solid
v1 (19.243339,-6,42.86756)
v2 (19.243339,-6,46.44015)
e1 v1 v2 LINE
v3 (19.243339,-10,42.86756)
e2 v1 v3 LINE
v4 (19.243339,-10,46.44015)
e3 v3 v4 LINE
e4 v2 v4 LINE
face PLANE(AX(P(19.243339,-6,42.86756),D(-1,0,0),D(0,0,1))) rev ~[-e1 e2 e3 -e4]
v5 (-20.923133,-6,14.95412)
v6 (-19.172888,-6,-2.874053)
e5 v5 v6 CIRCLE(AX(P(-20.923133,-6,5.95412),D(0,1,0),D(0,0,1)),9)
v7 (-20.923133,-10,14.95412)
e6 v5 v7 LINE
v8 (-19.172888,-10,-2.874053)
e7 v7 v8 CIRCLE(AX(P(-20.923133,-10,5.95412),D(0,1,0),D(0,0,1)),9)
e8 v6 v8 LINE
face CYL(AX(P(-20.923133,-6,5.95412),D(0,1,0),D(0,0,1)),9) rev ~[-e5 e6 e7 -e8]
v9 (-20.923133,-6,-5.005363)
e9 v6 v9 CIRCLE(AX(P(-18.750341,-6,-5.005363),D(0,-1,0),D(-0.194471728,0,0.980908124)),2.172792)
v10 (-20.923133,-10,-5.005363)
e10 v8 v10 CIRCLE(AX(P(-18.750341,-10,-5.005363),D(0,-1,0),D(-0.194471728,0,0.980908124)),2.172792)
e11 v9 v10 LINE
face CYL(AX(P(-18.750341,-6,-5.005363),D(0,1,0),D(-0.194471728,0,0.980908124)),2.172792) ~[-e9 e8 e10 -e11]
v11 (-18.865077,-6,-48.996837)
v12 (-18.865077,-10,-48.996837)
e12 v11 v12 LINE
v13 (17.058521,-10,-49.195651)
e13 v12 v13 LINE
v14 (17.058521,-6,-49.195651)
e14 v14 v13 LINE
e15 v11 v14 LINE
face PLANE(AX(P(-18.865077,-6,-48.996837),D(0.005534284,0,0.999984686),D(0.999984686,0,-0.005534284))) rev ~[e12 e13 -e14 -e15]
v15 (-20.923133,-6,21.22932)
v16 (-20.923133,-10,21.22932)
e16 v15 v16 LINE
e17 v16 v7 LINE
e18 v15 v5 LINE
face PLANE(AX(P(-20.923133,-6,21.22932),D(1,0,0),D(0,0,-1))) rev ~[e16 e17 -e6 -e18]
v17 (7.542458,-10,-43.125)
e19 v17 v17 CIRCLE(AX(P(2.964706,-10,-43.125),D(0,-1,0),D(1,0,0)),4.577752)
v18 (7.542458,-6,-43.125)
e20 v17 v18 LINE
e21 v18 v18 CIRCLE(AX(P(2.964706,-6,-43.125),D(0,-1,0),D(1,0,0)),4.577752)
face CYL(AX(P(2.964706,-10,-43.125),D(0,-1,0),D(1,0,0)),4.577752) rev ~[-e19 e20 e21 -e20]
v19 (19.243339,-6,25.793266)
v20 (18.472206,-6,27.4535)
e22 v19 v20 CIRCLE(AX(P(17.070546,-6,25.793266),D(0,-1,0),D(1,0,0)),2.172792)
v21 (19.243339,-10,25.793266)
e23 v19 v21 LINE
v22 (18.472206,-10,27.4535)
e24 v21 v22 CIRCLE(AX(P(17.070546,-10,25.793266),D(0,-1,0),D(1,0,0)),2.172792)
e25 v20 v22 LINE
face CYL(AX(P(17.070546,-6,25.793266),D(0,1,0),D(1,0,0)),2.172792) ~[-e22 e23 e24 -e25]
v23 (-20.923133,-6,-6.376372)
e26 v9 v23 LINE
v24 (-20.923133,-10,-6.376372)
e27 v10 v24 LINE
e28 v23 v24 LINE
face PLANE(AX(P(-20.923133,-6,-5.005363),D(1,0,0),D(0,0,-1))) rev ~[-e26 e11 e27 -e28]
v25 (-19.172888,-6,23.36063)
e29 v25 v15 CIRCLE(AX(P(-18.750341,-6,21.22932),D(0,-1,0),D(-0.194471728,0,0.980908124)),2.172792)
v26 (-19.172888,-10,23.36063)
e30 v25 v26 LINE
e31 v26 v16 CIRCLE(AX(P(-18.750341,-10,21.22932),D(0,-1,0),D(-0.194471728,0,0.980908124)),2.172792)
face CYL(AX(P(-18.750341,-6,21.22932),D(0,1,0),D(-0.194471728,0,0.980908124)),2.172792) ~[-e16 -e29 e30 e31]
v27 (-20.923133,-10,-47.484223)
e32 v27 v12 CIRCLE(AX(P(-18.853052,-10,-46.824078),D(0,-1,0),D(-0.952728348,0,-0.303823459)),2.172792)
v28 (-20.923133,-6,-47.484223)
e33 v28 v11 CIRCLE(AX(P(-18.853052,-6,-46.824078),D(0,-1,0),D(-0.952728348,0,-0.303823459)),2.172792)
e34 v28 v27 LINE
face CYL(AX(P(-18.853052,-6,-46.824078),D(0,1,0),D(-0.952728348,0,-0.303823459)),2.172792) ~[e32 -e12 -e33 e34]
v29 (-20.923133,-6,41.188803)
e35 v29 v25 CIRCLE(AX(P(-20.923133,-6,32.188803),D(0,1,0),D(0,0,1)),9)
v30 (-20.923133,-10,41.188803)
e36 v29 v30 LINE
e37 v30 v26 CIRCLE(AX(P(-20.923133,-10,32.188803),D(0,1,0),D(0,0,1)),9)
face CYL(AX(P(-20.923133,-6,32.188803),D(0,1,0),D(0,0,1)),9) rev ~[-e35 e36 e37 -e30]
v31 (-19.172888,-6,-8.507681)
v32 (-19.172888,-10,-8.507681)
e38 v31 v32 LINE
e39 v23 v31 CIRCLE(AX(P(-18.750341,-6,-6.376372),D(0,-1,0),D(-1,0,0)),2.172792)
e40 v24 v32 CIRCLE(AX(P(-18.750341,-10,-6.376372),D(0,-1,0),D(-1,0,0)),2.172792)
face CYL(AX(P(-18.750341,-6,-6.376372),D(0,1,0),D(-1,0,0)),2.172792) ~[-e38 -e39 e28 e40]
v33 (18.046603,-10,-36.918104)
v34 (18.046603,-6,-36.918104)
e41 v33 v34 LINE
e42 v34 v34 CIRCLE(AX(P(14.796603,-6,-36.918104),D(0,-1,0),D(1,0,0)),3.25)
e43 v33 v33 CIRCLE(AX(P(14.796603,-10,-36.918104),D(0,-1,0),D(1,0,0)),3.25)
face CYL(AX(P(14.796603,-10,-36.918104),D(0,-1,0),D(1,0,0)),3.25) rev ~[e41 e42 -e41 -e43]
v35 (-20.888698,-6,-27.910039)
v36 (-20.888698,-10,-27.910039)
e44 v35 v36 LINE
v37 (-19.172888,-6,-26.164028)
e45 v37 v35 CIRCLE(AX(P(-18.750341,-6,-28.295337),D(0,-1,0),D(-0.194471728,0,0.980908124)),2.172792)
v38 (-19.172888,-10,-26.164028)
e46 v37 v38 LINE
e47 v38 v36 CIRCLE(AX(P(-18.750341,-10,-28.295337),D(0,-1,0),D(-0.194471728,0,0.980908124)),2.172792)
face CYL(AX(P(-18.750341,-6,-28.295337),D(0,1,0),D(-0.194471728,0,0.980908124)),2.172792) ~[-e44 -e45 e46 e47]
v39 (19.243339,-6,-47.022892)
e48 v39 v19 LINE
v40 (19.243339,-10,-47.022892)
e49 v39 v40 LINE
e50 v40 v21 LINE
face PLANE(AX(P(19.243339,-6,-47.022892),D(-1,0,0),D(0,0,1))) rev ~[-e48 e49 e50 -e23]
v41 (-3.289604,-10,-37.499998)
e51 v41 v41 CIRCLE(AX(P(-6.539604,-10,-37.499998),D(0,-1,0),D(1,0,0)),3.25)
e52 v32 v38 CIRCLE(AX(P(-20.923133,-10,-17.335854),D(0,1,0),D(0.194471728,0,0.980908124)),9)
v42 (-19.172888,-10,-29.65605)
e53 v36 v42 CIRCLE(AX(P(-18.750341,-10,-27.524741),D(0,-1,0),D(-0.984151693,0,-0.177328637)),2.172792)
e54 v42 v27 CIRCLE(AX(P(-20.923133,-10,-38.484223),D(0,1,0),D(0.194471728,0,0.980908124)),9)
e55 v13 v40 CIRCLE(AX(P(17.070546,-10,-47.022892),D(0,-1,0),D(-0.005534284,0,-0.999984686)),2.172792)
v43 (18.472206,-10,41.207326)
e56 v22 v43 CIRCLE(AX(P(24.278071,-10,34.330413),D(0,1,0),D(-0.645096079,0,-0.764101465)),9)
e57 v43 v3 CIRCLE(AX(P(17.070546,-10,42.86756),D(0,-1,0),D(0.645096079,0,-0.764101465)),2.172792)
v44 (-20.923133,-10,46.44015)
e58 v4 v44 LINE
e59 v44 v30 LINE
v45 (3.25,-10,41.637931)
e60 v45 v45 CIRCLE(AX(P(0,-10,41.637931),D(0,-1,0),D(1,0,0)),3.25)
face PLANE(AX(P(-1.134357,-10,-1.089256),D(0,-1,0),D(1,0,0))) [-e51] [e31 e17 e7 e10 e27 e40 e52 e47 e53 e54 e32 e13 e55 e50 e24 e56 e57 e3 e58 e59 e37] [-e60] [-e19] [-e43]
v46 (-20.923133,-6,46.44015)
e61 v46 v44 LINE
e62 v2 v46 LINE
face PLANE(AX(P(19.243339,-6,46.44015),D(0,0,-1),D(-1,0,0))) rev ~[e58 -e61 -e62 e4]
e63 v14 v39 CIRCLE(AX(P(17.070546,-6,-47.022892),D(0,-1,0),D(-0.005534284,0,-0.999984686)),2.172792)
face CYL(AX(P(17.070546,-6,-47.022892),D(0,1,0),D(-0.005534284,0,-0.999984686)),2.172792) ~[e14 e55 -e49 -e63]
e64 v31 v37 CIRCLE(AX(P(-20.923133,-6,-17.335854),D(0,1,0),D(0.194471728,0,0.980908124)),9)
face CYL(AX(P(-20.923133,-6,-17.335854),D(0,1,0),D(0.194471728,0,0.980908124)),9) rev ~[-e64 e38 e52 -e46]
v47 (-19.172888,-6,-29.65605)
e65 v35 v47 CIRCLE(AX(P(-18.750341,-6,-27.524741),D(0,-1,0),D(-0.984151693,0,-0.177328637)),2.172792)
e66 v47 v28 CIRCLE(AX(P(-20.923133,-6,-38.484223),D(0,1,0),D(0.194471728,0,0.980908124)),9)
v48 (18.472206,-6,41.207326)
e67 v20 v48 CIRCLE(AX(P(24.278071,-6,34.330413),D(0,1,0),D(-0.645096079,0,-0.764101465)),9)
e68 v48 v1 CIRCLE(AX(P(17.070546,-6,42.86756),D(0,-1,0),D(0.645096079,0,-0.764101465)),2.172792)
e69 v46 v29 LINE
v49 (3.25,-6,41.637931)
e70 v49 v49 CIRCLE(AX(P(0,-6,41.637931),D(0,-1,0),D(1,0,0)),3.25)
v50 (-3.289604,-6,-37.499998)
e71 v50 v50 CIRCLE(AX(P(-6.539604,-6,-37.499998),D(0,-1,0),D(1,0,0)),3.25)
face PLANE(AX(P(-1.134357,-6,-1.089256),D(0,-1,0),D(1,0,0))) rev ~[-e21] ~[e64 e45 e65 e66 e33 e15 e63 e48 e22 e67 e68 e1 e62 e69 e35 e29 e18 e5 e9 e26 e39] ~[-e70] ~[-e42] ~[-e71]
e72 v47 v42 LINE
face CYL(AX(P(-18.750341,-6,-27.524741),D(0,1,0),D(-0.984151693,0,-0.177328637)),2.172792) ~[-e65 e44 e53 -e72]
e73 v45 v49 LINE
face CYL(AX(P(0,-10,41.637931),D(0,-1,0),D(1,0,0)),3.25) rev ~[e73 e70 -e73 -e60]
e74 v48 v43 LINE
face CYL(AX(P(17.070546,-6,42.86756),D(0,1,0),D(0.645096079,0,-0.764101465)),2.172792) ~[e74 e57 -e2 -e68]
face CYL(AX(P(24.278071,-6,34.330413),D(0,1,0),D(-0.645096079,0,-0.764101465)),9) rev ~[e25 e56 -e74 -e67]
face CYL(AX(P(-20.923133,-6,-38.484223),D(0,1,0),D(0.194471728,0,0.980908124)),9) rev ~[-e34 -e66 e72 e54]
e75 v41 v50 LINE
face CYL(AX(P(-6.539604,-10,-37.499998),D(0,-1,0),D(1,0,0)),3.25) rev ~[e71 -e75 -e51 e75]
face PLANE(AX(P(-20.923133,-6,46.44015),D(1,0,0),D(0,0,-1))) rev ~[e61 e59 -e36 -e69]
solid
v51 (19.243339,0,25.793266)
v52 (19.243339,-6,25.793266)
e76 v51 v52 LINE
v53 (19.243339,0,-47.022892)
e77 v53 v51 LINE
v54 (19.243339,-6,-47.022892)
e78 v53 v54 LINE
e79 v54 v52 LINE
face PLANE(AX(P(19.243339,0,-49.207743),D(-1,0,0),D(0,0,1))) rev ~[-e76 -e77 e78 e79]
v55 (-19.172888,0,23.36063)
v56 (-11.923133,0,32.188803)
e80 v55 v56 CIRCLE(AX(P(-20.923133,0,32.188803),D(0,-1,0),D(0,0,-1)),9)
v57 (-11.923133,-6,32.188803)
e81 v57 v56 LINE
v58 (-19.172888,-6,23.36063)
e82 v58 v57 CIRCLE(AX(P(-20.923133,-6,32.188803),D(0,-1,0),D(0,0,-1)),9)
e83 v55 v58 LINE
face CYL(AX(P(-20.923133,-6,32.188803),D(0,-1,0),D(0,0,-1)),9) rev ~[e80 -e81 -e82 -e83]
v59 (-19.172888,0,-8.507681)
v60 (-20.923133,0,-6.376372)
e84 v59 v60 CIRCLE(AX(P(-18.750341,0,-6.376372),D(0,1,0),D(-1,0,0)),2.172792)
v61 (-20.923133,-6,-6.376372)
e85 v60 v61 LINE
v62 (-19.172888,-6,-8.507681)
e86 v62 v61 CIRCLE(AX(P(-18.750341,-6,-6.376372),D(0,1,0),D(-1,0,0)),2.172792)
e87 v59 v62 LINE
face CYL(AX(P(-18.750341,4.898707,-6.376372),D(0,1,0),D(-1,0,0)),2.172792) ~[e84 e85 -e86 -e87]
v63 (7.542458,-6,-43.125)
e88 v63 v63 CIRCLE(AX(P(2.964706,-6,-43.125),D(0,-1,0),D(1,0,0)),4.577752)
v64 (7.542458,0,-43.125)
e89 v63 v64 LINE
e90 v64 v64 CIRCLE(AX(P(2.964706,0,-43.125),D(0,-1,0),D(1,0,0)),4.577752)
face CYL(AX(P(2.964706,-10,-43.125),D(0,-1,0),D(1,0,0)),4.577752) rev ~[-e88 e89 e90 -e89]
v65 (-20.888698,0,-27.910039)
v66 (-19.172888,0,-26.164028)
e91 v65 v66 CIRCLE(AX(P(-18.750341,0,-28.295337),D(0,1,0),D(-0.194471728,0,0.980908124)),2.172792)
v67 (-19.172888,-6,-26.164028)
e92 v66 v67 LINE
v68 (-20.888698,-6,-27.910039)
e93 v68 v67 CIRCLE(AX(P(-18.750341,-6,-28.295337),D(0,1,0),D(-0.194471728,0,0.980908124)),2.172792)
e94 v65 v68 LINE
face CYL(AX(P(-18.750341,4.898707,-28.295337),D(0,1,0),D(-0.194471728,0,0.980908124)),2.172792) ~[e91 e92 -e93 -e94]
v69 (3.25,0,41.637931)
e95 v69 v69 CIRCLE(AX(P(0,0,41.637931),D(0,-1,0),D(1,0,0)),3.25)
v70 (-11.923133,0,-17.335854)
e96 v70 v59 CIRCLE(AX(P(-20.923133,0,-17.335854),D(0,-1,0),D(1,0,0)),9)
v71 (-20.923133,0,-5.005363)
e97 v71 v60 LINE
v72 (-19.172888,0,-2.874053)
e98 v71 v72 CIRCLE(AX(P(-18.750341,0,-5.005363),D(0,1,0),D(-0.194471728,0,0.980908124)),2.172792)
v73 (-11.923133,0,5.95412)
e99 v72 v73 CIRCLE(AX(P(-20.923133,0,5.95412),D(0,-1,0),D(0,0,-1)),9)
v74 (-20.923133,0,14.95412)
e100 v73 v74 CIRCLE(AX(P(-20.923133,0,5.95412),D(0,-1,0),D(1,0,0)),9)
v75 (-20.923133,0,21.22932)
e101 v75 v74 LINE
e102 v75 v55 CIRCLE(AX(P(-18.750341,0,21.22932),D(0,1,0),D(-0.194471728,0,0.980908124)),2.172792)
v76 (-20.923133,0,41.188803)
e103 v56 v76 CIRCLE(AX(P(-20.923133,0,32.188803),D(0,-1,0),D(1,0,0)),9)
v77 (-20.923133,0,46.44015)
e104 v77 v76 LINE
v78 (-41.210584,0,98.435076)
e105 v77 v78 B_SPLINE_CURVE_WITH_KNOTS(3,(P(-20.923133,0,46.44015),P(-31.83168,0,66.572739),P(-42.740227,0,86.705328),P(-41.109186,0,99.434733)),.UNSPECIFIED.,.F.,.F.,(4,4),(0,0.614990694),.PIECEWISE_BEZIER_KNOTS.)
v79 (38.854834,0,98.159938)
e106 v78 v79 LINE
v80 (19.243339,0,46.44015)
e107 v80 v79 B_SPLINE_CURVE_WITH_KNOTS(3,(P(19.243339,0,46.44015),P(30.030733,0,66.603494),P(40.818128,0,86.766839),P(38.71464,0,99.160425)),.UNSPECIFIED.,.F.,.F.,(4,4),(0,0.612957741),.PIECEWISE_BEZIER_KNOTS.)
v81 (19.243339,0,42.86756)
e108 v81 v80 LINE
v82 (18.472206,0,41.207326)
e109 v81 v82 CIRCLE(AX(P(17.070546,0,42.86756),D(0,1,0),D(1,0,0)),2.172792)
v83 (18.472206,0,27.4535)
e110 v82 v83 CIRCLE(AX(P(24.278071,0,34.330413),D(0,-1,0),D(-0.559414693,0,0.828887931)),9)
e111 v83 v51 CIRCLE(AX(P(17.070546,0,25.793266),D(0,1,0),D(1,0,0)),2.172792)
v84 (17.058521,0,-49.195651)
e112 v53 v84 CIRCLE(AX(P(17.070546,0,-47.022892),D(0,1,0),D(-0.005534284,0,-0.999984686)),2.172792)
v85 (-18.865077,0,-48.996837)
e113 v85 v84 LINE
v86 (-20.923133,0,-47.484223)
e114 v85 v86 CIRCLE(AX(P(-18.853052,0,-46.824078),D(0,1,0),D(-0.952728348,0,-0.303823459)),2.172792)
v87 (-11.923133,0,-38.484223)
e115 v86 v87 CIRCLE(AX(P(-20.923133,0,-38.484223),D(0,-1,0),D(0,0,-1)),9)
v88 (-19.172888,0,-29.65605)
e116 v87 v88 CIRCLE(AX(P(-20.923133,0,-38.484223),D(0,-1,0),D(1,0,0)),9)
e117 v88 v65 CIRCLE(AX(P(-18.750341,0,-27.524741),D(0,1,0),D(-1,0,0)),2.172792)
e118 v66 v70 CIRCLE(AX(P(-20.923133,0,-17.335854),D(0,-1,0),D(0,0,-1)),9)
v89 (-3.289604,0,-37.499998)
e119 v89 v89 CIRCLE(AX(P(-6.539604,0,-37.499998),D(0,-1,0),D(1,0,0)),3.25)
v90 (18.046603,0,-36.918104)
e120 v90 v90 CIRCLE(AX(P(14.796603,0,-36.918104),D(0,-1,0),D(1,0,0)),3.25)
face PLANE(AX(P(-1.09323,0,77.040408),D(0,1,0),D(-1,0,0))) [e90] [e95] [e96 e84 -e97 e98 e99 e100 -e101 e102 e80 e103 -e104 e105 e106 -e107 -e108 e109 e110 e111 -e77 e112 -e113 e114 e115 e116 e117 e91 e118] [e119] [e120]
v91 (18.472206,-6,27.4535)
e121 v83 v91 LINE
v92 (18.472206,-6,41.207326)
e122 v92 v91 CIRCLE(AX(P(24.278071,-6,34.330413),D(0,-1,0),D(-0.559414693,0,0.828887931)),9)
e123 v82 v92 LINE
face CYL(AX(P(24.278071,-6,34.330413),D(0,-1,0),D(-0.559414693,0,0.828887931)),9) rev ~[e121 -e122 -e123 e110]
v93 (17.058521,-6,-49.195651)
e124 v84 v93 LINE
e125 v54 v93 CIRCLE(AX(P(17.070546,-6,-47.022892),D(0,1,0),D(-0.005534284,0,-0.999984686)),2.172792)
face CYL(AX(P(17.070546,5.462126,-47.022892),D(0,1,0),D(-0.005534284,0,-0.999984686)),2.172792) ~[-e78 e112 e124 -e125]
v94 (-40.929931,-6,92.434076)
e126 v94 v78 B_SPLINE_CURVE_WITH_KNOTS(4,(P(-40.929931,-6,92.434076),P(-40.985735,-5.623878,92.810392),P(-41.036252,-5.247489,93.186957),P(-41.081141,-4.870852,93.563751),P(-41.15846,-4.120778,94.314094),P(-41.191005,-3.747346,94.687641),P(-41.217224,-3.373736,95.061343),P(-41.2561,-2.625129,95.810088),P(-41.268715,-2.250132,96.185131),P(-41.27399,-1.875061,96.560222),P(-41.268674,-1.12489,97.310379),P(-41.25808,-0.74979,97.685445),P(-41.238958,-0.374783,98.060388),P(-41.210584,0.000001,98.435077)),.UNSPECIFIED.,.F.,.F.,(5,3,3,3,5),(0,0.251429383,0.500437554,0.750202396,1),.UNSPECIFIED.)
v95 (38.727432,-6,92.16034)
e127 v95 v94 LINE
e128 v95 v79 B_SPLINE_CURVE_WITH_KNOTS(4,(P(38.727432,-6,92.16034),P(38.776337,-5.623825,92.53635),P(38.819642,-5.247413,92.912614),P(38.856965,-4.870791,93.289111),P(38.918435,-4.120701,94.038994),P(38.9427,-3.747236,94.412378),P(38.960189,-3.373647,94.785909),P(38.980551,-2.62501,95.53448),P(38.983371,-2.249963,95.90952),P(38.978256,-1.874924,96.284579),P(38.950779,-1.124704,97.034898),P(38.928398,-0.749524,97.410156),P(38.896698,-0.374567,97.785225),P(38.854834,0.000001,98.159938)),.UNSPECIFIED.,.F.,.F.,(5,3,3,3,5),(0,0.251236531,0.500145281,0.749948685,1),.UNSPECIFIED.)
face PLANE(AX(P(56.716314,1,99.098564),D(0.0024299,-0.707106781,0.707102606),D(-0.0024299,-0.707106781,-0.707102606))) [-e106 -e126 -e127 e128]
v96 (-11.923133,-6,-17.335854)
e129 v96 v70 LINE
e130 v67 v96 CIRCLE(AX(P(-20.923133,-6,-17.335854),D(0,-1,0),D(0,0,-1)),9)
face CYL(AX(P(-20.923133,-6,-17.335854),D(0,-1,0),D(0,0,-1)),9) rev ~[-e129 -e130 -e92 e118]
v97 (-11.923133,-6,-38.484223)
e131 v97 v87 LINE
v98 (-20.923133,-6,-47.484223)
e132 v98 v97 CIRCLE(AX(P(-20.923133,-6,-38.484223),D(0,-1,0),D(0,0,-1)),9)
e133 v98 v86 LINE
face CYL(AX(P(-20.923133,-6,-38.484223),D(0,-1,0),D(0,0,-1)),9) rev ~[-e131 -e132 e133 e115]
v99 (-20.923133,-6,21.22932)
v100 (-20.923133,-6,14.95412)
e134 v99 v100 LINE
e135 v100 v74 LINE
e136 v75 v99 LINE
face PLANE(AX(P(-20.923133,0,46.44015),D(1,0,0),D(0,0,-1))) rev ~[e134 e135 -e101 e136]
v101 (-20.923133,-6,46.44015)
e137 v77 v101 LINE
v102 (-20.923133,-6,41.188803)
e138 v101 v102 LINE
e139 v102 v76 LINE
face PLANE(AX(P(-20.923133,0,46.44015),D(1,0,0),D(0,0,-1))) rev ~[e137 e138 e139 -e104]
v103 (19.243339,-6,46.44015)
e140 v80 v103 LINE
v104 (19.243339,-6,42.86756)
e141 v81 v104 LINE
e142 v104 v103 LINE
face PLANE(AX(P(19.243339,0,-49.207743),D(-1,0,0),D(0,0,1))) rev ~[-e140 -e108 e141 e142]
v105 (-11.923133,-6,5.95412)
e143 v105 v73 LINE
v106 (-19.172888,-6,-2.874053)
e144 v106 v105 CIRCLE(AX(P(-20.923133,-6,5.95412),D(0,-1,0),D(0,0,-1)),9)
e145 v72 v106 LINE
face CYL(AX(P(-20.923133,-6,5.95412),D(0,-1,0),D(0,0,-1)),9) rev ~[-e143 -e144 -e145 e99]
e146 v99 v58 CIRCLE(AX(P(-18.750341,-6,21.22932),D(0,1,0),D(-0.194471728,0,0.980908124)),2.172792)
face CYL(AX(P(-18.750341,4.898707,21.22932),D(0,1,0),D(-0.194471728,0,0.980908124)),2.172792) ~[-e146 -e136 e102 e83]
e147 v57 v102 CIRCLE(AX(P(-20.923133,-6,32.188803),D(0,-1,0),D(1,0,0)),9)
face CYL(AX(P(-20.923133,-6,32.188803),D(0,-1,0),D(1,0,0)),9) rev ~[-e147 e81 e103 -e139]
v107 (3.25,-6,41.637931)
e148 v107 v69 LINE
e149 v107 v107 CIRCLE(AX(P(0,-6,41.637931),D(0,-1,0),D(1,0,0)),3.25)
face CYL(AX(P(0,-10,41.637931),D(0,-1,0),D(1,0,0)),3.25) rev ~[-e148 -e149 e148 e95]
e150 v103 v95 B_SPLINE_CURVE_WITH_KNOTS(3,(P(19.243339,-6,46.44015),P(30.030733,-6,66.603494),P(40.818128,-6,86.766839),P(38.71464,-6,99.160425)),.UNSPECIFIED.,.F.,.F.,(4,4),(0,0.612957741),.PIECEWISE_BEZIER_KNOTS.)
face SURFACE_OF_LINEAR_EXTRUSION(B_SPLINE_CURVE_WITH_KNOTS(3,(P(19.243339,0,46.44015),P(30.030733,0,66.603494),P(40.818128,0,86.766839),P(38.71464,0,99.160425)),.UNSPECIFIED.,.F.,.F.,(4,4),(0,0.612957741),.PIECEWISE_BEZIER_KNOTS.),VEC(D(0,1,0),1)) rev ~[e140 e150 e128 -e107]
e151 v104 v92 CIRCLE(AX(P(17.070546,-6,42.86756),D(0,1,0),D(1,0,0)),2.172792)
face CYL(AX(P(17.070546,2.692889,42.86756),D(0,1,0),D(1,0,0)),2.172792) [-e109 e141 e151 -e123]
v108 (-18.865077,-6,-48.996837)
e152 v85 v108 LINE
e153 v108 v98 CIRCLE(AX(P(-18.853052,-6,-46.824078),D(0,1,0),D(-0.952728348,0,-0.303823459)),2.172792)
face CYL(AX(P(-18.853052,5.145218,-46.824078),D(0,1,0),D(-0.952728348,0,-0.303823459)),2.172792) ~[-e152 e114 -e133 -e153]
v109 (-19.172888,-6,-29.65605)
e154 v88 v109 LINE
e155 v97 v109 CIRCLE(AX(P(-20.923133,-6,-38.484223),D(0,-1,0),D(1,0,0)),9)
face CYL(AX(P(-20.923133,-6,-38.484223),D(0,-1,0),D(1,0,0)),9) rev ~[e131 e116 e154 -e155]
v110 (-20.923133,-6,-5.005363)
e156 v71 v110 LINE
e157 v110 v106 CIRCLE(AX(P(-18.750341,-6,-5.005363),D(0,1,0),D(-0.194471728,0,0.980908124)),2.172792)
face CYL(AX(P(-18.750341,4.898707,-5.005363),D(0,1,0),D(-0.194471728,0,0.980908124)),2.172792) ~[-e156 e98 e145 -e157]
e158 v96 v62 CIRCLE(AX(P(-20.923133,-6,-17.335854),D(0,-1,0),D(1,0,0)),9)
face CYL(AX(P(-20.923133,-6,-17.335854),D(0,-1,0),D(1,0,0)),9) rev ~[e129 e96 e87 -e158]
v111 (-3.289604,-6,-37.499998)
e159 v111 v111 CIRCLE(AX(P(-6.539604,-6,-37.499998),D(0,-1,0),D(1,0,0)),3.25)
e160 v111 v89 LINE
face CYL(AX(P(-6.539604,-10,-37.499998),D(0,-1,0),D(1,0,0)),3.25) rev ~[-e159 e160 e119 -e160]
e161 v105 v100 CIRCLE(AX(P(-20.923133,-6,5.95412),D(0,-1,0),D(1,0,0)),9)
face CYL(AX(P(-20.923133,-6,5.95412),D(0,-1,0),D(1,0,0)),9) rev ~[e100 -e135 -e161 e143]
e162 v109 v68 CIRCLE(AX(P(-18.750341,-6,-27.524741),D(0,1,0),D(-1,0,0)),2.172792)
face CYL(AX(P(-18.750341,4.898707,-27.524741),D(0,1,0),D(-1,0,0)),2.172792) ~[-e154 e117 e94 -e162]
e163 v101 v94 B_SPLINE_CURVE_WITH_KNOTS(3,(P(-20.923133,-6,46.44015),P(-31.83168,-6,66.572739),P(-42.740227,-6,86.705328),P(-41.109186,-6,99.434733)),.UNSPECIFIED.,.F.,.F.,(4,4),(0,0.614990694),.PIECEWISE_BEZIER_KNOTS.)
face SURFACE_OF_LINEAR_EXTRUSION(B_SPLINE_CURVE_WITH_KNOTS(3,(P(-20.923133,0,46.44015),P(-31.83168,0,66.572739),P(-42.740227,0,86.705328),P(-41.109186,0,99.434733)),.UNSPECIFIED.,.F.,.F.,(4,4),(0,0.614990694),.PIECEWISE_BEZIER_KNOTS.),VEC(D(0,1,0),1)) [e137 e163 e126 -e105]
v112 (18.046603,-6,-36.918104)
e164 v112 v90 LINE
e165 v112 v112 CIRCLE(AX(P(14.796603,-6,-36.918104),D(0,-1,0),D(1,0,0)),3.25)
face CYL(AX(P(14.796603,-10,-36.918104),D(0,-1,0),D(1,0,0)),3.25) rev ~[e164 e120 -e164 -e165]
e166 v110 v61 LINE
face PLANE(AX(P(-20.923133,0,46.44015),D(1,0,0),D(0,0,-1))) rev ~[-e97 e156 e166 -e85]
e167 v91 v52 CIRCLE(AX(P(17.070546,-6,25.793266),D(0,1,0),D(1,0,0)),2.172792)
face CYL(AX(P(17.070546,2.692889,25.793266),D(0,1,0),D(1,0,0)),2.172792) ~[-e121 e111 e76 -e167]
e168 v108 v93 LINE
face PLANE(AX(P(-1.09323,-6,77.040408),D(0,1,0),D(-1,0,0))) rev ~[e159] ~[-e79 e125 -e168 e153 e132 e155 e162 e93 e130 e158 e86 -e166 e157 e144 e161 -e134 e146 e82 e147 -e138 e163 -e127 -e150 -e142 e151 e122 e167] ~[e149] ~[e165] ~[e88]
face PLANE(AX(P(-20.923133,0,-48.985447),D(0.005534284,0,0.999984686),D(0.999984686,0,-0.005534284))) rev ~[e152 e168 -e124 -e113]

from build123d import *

# Parameters (mm, degrees)
F2_DEPTH    = 6
F3_T1_DEPTH = 115.827858657
F6_DEPTH    = 25
F7_T1_DEPTH = 15.7974131941
F7_T3_DEPTH = 16.290436999
F7_T5_DEPTH = 16.9242525679
F7_T7_DEPTH = 11.385777601
F9_DEPTH    = 4
F10_R       = 3.25
F10_R_2     = 4.5777520803
F11_DEPTH   = 25


# Not quite as in the source:
# - a fillet or chamfer that OpenCascade refuses, or shapes differently, is made with other operations: its cross-section is extruded or revolved along the edge and cut away or added


with BuildPart() as f2:
    # F1 (on face) → F2 (new body)
    with BuildSketch(Plane.XZ):
        with BuildLine():
            add(Edge.make_bspline(
                [(-20.9231331974, 46.4401495715), (-31.8316802492, 66.5727386597), (-42.740227301, 86.705327748), (-41.1091856658, 99.4347333908)],
                knots=[0, 0, 0, 0, 0.6149906941, 0.6149906941, 0.6149906941, 0.6149906941], degree=3))
            Line((-20.9231331974, 46.4401495715), (19.2433385447, 46.4401495715))
            add(Edge.make_bspline(
                [(19.2433385447, 46.4401495715), (30.0307332183, 66.6034940791), (40.8181278918, 86.7668385867), (38.7146398425, 99.160425365)],
                knots=[0, 0, 0, 0, 0.6129577408, 0.6129577408, 0.6129577408, 0.6129577408], degree=3))
            Line((38.7146398425, 99.160425365), (-41.1091856658, 99.4347333908))
        make_face()
        Polygon((19.2433385447, 46.4401495715), (-20.9231331974, 46.4401495715), (-20.9231331974, -48.9854468352), (19.2433385447, -49.2077428815), align=None)
    extrude(amount=F2_DEPTH)

    # F3: chamfer of 7 on 1 edges, made by hand

    # F3_s2 → F3_t1 (cut)
    with BuildSketch(Plane(origin=(56.3751046529, 0, -0.1937284209), x_dir=(0, 1, 0), z_dir=(-0.9999940956, 0, 0.0034363976))):
        Polygon((1, -99.2928787763), (-6, -92.2928787763), (-6, -99.2928787763), align=None)
    extrude(amount=F3_T1_DEPTH, mode=Mode.SUBTRACT)

    # F4 (on face) + F5 (on face) → F6 (cut)
    with BuildSketch(Plane.XZ.offset(6)):
        with BuildLine():
            ThreePointArc((-20.9231331974, 23.1888029575), (-14.5591721667, 25.8248419269), (-11.9231331974, 32.1888029575))
            ThreePointArc((-11.9231331974, 32.1888029575), (-14.5591721667, 38.5527639882), (-20.9231331974, 41.1888029575))
            Line((-20.9231331974, 41.1888029575), (-20.9231331974, 23.1888029575))
        make_face()
        with BuildLine():
            ThreePointArc((-11.9231331974, 5.9541198425), (-14.5591721667, 12.3180808732), (-20.9231331974, 14.9541198425))
            Line((-20.9231331974, 14.9541198425), (-20.9231331974, -3.0458801575))
            ThreePointArc((-20.9231331974, -3.0458801575), (-14.5591721667, -0.4098411882), (-11.9231331974, 5.9541198425))
        make_face()
        with BuildLine():
            ThreePointArc((-11.9231331974, -17.3358544707), (-14.5591721667, -10.9718934401), (-20.9231331974, -8.3358544707))
            Line((-20.9231331974, -8.3358544707), (-20.9231331974, -26.3358544707))
            ThreePointArc((-20.9231331974, -26.3358544707), (-14.5591721667, -23.6998155014), (-11.9231331974, -17.3358544707))
        make_face()
        with BuildLine():
            ThreePointArc((-11.9231331974, -38.484223187), (-14.5591721667, -32.1202621563), (-20.9231331974, -29.484223187))
            Line((-20.9231331974, -29.484223187), (-20.9231331974, -47.484223187))
            ThreePointArc((-20.9231331974, -47.484223187), (-14.5591721667, -44.8481842176), (-11.9231331974, -38.484223187))
        make_face()
    with BuildSketch(Plane.XZ.offset(6)):
        with BuildLine():
            Line((19.2433385447, 26.8704213686), (19.2433385447, 41.7904041223))
            ThreePointArc((19.2433385447, 41.7904041223), (15.2780707777, 34.3304127455), (19.2433385447, 26.8704213686))
        make_face()
    extrude(amount=-F6_DEPTH, mode=Mode.SUBTRACT)

    # F7: fillet of radius 2.1727922061 on 9 edges, made by hand

    # F7_s2 → F7_t1 (cut)
    with BuildSketch(Plane.XZ.offset(-4.898706597)):
        with BuildLine():
            ThreePointArc((-19.172887646, 23.3606298447), (-20.4294973343, 22.6082546705), (-20.9231331974, 21.2293203187))
            Line((-20.9231331974, 21.2293203187), (-20.9231331974, 23.1888029575))
            ThreePointArc((-20.9231331974, 23.1888029575), (-20.0438033433, 23.2318626871), (-19.172887646, 23.3606298447))
        make_face()
        with BuildLine():
            ThreePointArc((-19.172887646, -2.8740532703), (-20.4294973343, -3.6264284446), (-20.9231331974, -5.0053627963))
            Line((-20.9231331974, -5.0053627963), (-20.9231331974, -3.0458801575))
            ThreePointArc((-20.9231331974, -3.0458801575), (-20.0438033433, -3.0028204279), (-19.172887646, -2.8740532703))
        make_face()
        with BuildLine():
            ThreePointArc((-20.9231331974, -6.3763718319), (-20.4294973343, -7.7553061837), (-19.172887646, -8.5076813579))
            ThreePointArc((-19.172887646, -8.5076813579), (-20.0438033433, -8.3789142003), (-20.9231331974, -8.3358544707))
            Line((-20.9231331974, -8.3358544707), (-20.9231331974, -6.3763718319))
        make_face()
        with BuildLine():
            ThreePointArc((-19.172887646, -26.1640275835), (-20.4294973343, -26.9164027578), (-20.9231331974, -28.2953371095))
            Line((-20.9231331974, -28.2953371095), (-20.9231331974, -26.3358544707))
            ThreePointArc((-20.9231331974, -26.3358544707), (-20.0438033433, -26.2927947411), (-19.172887646, -26.1640275835))
        make_face()
        with BuildLine():
            ThreePointArc((-20.9231331974, -27.5247405482), (-20.4294973343, -28.9036748999), (-19.172887646, -29.6560500742))
            ThreePointArc((-19.172887646, -29.6560500742), (-20.0438033433, -29.5272829166), (-20.9231331974, -29.484223187))
            Line((-20.9231331974, -29.484223187), (-20.9231331974, -27.5247405482))
        make_face()
    extrude(amount=F7_T1_DEPTH, mode=Mode.SUBTRACT)

    # F7_s4 → F7_t3 (cut)
    with BuildSketch(Plane.XZ.offset(-5.1452184995)):
        with BuildLine():
            ThreePointArc((-20.9231331974, -47.484223187), (-20.1398278758, -48.5748592028), (-18.8650773156, -48.9968368743))
            Line((-18.8650773156, -48.9968368743), (-20.9231331974, -48.9854468352))
            Line((-20.9231331974, -48.9854468352), (-20.9231331974, -47.484223187))
        make_face()
    extrude(amount=F7_T3_DEPTH, mode=Mode.SUBTRACT)

    # F7_s6 → F7_t5 (cut)
    with BuildSketch(Plane.XZ.offset(-5.4621262839)):
        with BuildLine():
            ThreePointArc((17.0585214905, -49.1956512993), (18.6026851174, -48.5635340308), (19.2433385447, -47.0228923679))
            Line((19.2433385447, -47.0228923679), (19.2433385447, -49.2077428815))
            Line((19.2433385447, -49.2077428815), (17.0585214905, -49.1956512993))
        make_face()
    extrude(amount=F7_T5_DEPTH, mode=Mode.SUBTRACT)

    # F7_s8 → F7_t7 (cut)
    with BuildSketch(Plane.XZ.offset(-2.6928888005)):
        with BuildLine():
            ThreePointArc((19.2433385447, 42.8675596425), (19.0411479361, 41.9522698987), (18.4722060704, 41.2073259339))
            ThreePointArc((18.4722060704, 41.2073259339), (18.8499375305, 41.5092266762), (19.2433385447, 41.7904041223))
            Line((19.2433385447, 41.7904041223), (19.2433385447, 42.8675596425))
        make_face()
        with BuildLine():
            ThreePointArc((19.2433385447, 25.7932658484), (19.0411479361, 26.7085555922), (18.4722060704, 27.4534995571))
            ThreePointArc((18.4722060704, 27.4534995571), (18.8499375305, 27.1515988148), (19.2433385447, 26.8704213686))
            Line((19.2433385447, 26.8704213686), (19.2433385447, 25.7932658484))
        make_face()
    extrude(amount=F7_T7_DEPTH, mode=Mode.SUBTRACT)


with BuildPart() as f9:
    # F8 (on face) → F9 (new body)
    with BuildSketch(Plane.XZ.offset(6)):
        with BuildLine():
            Line((19.2433385447, 46.4401495715), (-20.9231331974, 46.4401495715))
            Line((-20.9231331974, 46.4401495715), (-20.9231331974, 41.1888029575))
            ThreePointArc((-20.9231331974, 41.1888029575), (-11.9661929269, 33.0681328116), (-19.172887646, 23.3606298447))
            ThreePointArc((-19.172887646, 23.3606298447), (-20.4294973343, 22.6082546704), (-20.9231331974, 21.2293203187))
            Line((-20.9231331974, 21.2293203187), (-20.9231331974, 14.9541198425))
            ThreePointArc((-20.9231331974, 14.9541198425), (-11.9661929269, 6.8334496966), (-19.172887646, -2.8740532703))
            ThreePointArc((-19.172887646, -2.8740532703), (-20.4294973343, -3.6264284446), (-20.9231331974, -5.0053627963))
            Line((-20.9231331974, -5.0053627963), (-20.9231331974, -6.3763718319))
            ThreePointArc((-20.9231331974, -6.3763718319), (-20.4294973343, -7.7553061836), (-19.172887646, -8.5076813579))
            ThreePointArc((-19.172887646, -8.5076813579), (-11.9231331974, -17.3358544707), (-19.172887646, -26.1640275836))
            ThreePointArc((-19.172887646, -26.1640275835), (-20.3000815705, -26.7724024071), (-20.888698119, -27.9100388289))
            ThreePointArc((-20.888698119, -27.9100388289), (-20.3000815705, -29.0476752506), (-19.172887646, -29.6560500742))
            ThreePointArc((-19.172887646, -29.6560500741), (-11.9661929269, -39.3635530411), (-20.9231331974, -47.484223187))
            ThreePointArc((-20.9231331974, -47.484223187), (-20.1398278758, -48.5748592028), (-18.8650773156, -48.9968368743))
            Line((-18.8650773156, -48.9968368743), (17.0585214905, -49.1956512993))
            ThreePointArc((17.0585214905, -49.1956512993), (18.6026851174, -48.5635340308), (19.2433385447, -47.0228923679))
            Line((19.2433385447, -47.0228923679), (19.2433385447, 25.7932658484))
            ThreePointArc((19.2433385447, 25.7932658484), (19.0411479361, 26.7085555922), (18.4722060704, 27.4534995571))
            ThreePointArc((18.4722060704, 27.4534995571), (15.2780707777, 34.3304127455), (18.4722060704, 41.2073259339))
            ThreePointArc((18.4722060704, 41.2073259339), (19.0411479361, 41.9522698987), (19.2433385447, 42.8675596425))
            Line((19.2433385447, 42.8675596425), (19.2433385447, 46.4401495715))
        make_face()
    extrude(amount=F9_DEPTH)


with BuildPart() as f11_tool:
    # F10 (on face) → F11 (new body)
    with BuildSketch(Plane.XZ.offset(10)):
        with Locations((0, 41.6379310191)):
            Circle(F10_R)
        with Locations((-6.5396036953, -37.4999977648)):
            Circle(F10_R)
        with Locations((2.9647059273, -43.124999851)):
            Circle(F10_R_2)
        with Locations((14.796603471, -36.9181036949)):
            Circle(F10_R)
    extrude(amount=-F11_DEPTH)


with BuildPart() as f2_1:
    add(f2.part)

    # F11: cut by f11_tool
    add(f11_tool.part, mode=Mode.SUBTRACT)


with BuildPart() as f9_1:
    add(f9.part)

    # F11: cut by f11_tool
    add(f11_tool.part, mode=Mode.SUBTRACT)


solid = Compound([f2_1.part, f9_1.part])
